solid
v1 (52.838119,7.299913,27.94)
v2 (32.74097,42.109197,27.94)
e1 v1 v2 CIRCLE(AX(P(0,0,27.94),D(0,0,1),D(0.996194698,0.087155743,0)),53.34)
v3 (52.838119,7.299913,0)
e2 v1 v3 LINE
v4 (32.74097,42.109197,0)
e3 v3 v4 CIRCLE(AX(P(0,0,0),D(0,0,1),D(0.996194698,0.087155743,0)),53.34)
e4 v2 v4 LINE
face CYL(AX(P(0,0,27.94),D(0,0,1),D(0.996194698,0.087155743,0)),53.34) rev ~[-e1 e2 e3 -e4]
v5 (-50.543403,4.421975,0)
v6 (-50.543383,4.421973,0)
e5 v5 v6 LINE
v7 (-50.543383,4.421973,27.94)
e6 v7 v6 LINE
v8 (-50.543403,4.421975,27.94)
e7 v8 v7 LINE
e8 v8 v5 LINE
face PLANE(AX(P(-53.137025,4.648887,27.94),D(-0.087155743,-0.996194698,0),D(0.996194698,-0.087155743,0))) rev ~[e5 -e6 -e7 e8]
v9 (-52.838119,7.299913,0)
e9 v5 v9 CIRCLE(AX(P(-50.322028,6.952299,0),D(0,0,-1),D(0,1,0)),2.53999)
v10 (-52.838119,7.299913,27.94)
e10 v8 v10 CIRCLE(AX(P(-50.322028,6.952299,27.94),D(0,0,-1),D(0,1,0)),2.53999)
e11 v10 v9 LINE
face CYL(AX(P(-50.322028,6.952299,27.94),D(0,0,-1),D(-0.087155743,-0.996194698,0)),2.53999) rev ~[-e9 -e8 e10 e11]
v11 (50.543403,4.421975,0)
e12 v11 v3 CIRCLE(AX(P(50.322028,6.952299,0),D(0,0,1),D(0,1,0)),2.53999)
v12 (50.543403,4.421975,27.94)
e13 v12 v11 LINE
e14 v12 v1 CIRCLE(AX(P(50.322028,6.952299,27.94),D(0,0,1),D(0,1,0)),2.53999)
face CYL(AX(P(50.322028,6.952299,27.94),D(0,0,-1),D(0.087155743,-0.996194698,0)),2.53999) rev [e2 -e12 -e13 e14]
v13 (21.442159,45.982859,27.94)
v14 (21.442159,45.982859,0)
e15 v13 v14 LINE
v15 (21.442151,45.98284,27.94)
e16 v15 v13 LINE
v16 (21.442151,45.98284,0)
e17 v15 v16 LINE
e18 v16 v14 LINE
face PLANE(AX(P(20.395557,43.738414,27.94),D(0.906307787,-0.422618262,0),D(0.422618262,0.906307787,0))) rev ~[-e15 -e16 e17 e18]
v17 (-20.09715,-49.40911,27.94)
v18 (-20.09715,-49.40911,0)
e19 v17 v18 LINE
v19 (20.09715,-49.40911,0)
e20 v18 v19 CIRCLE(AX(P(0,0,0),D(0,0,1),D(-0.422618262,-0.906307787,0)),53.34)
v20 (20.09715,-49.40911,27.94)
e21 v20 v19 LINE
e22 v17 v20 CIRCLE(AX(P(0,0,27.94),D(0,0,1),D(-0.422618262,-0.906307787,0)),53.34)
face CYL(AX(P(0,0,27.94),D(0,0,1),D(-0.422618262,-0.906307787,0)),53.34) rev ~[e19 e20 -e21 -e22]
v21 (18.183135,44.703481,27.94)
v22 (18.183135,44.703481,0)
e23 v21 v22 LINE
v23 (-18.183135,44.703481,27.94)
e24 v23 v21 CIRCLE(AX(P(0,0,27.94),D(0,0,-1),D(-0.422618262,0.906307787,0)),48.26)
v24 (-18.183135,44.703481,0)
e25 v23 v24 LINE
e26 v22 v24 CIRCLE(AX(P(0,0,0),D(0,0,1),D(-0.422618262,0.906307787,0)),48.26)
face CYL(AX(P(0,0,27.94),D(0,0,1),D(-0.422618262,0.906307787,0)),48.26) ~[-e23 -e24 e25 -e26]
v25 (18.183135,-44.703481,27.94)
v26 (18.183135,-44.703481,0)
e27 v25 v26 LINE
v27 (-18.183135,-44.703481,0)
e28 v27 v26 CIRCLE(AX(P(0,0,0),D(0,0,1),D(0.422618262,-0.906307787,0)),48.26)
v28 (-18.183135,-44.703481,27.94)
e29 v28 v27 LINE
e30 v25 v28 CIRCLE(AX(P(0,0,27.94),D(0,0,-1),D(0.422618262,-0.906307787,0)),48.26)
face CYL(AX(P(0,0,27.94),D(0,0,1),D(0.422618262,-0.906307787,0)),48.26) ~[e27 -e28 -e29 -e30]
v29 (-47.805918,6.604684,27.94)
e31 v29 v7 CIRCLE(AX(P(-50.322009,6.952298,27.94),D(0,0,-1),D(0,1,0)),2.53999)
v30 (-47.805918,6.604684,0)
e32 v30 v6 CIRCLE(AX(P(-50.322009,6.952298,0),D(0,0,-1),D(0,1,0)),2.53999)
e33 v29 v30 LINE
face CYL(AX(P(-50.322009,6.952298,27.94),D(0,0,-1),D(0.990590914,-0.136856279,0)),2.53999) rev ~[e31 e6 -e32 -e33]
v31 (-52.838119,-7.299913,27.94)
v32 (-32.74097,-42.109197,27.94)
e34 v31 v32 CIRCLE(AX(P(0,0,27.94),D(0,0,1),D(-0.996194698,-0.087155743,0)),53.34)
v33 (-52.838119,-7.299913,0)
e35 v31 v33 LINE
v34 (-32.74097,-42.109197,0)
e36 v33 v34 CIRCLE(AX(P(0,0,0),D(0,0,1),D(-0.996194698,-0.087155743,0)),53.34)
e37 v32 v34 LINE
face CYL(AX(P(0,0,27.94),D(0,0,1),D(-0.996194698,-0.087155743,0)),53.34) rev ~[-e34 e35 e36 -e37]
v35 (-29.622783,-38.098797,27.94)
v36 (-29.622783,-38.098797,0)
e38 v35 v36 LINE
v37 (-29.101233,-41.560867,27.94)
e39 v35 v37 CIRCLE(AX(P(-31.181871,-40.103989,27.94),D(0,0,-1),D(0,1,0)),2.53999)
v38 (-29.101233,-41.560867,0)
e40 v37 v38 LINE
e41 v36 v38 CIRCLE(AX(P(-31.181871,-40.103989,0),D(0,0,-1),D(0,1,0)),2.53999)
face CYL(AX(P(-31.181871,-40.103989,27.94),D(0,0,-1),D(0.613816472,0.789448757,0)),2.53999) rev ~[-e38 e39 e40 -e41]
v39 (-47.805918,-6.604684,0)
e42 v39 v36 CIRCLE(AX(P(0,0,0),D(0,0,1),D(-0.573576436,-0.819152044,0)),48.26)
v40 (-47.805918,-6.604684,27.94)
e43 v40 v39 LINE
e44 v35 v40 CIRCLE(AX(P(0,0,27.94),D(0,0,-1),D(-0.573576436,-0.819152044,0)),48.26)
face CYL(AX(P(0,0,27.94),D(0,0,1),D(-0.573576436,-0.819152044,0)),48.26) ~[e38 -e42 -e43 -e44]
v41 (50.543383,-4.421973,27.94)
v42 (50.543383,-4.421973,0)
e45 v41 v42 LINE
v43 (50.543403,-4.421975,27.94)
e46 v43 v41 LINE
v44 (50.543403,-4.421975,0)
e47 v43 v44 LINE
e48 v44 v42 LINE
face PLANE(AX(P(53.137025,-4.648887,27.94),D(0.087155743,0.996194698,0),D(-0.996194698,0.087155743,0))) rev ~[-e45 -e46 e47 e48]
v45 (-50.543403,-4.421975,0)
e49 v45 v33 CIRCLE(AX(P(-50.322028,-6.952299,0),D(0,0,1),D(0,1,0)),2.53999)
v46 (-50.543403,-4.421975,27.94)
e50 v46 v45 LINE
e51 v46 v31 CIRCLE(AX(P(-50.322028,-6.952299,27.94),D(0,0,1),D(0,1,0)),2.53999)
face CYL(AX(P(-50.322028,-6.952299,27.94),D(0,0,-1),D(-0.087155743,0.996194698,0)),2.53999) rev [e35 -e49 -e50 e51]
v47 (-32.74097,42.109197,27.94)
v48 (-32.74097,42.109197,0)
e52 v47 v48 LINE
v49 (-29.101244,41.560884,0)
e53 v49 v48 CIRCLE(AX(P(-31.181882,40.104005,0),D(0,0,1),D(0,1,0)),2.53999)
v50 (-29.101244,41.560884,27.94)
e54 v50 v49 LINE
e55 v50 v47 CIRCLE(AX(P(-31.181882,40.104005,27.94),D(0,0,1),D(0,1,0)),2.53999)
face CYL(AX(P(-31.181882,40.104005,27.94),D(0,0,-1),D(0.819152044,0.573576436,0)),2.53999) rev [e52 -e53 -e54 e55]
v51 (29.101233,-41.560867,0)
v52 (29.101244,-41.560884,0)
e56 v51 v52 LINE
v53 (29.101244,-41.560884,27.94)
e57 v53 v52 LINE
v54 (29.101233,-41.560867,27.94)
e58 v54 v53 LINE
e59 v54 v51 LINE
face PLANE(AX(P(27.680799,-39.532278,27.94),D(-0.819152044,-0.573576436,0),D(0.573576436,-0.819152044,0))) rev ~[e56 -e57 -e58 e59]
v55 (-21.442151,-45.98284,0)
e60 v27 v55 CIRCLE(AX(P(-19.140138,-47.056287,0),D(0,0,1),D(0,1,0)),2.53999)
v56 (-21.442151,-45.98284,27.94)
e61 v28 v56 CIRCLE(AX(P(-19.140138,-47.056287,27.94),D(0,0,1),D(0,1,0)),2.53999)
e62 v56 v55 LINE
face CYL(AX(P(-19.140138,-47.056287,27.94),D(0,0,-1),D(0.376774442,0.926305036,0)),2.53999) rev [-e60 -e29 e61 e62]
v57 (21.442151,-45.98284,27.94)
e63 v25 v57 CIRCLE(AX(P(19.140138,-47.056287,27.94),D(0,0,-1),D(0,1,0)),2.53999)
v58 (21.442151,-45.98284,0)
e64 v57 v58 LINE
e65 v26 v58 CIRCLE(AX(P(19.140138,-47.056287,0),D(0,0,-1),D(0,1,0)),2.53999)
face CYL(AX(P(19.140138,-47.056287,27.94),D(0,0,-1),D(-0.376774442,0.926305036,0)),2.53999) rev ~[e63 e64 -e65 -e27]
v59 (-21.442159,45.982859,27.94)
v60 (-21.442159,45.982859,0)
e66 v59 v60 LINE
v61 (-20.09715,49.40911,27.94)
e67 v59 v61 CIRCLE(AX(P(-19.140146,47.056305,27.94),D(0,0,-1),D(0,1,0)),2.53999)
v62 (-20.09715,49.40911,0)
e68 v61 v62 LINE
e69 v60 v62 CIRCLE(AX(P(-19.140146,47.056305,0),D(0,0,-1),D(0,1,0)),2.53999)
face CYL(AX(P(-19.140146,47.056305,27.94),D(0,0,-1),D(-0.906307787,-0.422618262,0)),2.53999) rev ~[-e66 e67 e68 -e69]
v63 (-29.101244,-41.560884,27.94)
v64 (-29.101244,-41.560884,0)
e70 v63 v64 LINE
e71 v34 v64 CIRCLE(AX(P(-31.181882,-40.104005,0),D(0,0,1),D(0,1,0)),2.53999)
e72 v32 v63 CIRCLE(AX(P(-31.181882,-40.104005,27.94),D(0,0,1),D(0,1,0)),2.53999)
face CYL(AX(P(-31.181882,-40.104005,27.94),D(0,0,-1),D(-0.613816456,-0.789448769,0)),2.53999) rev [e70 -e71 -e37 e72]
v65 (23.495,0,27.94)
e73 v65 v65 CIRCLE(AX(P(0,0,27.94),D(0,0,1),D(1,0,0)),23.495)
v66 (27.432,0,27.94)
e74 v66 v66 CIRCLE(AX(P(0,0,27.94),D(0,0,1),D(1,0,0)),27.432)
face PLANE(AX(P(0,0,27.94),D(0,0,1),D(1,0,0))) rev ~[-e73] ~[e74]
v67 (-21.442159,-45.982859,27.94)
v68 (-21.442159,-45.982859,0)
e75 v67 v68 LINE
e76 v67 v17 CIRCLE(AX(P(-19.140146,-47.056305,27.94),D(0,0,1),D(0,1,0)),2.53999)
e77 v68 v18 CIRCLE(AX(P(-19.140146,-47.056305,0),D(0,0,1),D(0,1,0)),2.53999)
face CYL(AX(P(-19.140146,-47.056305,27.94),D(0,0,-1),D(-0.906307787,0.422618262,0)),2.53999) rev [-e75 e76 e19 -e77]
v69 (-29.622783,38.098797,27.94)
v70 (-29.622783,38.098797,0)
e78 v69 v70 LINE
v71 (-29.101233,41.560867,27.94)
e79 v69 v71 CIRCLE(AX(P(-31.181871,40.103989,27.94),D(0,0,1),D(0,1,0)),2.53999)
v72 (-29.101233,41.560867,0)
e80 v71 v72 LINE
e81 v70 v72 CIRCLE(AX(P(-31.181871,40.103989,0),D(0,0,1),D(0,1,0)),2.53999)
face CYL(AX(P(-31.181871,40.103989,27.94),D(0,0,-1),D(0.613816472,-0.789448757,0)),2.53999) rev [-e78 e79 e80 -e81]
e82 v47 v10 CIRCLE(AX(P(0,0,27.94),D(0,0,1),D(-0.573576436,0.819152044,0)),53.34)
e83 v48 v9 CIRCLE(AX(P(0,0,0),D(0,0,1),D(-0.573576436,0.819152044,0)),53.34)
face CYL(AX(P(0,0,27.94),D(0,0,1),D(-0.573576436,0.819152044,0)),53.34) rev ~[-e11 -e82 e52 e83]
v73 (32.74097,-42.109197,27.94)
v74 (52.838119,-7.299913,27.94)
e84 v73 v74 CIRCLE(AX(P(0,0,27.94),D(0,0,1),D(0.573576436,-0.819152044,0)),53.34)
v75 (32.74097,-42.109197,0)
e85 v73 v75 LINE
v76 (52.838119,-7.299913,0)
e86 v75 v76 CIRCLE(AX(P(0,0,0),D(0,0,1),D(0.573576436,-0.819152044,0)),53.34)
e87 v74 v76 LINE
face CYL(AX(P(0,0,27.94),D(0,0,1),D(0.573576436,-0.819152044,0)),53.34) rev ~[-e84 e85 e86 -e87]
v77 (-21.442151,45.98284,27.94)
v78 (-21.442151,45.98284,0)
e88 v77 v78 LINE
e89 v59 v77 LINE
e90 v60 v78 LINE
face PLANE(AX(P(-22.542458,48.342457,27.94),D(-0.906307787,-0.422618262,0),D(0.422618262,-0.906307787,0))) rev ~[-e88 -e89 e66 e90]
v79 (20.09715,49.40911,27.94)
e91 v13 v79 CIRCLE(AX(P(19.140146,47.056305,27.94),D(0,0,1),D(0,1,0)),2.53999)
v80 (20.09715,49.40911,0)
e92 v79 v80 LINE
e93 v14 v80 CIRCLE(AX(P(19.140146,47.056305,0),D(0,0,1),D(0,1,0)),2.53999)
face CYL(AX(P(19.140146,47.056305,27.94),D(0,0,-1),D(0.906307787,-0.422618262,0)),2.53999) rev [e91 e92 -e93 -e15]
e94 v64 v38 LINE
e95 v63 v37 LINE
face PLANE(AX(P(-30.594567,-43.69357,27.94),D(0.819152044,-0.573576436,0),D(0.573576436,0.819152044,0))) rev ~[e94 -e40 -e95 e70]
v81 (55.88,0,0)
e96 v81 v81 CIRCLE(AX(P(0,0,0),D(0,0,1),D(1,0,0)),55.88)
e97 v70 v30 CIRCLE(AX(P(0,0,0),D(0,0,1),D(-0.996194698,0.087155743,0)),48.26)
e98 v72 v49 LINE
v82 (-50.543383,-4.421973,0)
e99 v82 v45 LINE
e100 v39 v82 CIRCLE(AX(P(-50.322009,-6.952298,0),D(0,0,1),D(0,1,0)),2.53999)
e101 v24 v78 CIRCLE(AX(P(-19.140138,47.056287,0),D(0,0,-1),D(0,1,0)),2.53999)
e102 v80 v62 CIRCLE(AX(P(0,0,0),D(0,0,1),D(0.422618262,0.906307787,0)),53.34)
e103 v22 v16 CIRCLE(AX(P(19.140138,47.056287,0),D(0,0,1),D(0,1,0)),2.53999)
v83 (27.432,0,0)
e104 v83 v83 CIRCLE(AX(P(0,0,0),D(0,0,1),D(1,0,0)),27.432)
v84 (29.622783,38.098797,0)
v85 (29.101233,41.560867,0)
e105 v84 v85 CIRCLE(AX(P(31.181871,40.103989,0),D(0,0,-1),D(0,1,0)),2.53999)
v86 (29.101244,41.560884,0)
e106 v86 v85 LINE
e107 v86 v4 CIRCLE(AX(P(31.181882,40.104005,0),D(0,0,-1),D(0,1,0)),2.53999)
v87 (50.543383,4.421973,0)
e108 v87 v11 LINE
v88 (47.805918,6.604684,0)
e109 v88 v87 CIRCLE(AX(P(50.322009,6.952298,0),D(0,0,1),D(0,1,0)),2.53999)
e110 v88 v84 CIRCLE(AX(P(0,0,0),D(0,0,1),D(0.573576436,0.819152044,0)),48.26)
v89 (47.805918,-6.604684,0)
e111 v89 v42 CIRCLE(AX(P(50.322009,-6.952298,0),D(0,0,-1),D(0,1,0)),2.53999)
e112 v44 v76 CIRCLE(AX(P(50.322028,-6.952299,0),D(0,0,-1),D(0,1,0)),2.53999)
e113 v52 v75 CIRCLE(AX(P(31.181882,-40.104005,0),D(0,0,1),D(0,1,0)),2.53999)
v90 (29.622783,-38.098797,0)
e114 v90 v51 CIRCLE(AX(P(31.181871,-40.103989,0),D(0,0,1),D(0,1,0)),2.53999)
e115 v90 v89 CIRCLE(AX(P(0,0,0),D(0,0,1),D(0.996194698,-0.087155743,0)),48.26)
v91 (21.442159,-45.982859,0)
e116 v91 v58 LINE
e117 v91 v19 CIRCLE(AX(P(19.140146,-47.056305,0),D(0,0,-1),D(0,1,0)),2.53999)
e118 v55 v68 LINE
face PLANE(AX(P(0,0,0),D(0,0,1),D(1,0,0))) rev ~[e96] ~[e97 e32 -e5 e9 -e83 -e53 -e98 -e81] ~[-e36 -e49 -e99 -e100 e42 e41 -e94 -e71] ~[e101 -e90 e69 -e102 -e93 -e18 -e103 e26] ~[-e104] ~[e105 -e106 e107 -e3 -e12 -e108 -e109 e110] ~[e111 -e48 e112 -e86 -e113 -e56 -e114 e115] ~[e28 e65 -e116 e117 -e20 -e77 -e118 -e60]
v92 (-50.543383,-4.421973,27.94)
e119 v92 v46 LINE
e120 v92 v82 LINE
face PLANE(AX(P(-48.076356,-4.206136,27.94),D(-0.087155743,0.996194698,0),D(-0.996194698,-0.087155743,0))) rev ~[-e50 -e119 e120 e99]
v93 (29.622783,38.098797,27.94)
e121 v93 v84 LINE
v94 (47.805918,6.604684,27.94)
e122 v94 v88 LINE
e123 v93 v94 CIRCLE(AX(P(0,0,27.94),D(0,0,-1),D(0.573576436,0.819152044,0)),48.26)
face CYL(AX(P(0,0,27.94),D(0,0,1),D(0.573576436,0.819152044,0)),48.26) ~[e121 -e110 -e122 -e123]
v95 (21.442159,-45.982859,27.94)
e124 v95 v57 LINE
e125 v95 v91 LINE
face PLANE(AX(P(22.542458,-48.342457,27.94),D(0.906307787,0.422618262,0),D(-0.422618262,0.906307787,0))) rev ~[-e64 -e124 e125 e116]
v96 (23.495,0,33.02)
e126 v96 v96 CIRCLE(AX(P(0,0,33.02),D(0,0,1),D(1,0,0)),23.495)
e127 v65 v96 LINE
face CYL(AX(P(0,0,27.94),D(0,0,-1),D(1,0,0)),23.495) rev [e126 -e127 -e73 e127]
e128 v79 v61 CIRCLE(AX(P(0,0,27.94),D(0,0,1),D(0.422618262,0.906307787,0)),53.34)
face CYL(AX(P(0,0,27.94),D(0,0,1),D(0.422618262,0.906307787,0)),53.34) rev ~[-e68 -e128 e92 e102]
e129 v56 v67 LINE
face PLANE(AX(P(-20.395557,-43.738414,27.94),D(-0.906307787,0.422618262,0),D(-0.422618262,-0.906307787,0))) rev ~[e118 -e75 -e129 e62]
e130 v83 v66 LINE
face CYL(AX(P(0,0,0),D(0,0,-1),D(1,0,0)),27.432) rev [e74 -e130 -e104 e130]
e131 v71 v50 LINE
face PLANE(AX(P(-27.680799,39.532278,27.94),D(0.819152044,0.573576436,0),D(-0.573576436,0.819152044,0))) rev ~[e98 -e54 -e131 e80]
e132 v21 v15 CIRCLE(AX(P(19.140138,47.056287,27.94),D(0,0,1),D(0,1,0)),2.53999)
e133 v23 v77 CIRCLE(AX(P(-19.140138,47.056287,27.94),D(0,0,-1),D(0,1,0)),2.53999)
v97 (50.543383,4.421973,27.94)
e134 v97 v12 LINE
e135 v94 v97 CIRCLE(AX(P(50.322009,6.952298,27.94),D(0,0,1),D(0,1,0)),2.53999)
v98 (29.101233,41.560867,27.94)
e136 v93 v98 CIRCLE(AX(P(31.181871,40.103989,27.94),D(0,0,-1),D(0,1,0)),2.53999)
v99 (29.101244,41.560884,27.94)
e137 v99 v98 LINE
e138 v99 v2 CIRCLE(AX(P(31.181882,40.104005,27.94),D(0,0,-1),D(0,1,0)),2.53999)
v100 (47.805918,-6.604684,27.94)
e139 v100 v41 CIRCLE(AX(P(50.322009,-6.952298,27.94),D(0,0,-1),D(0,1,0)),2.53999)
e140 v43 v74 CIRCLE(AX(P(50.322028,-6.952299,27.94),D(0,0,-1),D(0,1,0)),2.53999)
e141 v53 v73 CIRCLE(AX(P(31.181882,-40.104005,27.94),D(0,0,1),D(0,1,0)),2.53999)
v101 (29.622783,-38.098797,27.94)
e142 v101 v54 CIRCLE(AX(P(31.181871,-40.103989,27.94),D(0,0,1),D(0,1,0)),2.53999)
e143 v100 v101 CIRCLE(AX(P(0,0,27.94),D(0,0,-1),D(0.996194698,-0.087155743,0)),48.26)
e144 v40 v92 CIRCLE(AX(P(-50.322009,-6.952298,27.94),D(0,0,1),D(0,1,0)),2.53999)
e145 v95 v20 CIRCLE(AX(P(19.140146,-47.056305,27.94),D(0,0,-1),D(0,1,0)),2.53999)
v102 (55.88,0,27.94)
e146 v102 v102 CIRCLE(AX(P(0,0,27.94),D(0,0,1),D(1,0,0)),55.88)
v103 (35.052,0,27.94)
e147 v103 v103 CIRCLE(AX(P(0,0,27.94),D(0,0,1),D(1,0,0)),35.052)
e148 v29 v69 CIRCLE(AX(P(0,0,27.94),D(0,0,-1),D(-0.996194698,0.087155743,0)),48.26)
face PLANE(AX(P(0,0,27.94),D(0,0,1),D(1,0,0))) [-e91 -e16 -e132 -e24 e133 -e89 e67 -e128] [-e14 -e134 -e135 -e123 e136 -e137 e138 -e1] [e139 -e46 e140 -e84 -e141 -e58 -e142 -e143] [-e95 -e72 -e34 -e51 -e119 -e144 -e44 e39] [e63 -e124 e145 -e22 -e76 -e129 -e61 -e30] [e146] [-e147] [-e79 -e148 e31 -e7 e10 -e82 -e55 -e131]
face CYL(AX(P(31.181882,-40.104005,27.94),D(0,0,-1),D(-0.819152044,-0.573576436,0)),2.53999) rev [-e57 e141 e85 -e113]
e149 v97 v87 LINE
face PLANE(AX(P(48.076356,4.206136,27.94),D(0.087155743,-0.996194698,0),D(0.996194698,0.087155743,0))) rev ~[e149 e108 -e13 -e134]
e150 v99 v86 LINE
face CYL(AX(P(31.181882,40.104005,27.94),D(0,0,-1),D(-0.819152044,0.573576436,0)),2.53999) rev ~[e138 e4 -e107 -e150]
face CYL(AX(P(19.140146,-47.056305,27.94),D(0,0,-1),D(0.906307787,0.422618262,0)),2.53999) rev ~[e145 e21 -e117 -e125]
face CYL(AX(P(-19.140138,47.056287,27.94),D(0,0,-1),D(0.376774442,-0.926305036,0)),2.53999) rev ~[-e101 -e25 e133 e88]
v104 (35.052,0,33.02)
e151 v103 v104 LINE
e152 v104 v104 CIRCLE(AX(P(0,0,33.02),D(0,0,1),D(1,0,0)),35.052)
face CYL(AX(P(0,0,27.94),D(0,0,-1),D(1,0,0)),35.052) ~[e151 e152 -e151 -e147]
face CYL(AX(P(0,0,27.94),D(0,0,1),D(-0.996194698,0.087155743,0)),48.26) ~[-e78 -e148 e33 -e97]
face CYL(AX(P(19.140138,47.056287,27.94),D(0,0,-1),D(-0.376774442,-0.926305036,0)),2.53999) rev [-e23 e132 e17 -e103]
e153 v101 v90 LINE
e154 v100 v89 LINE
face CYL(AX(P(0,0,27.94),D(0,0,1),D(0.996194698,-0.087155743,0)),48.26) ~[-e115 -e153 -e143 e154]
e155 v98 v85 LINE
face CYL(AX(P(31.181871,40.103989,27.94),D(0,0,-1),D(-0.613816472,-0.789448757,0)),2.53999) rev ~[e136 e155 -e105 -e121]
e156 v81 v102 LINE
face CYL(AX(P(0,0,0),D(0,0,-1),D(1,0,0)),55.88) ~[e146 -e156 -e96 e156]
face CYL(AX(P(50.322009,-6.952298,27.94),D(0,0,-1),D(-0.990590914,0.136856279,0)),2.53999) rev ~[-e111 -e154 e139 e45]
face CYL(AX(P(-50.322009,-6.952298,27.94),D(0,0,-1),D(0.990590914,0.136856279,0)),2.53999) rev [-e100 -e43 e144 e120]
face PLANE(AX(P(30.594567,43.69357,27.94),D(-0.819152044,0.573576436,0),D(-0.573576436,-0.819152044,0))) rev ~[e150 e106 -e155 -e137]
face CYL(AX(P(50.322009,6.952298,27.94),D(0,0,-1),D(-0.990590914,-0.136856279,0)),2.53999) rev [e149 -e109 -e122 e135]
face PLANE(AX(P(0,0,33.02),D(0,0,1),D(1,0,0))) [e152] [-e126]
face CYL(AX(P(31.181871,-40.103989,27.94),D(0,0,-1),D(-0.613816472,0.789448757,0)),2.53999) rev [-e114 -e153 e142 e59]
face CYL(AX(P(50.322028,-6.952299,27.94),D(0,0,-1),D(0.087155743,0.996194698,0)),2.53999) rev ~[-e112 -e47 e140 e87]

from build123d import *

# Parameters (mm, degrees)
F0_R            = 55.88
F0_R_2          = 27.432
F1_DEPTH        = 27.94
F2_R            = 35.052
F2_R_2          = 23.495
F3_DEPTH        = 5.08
F5_DEPTH        = 27.941
F5_COPIES_COUNT = 6
F6_R            = 2.53999


# Not quite as in the source:
# - a fillet or chamfer is up to 0.001 mm smaller than in the source, because OpenCascade refuses the exact size
# - a pattern or mirror of a feature is missing from the dataset's text; its kind, count and spacing are read off the source's solid


with BuildPart() as f1:
    # F0 (on Top) → F1 (new body)
    with BuildSketch(Plane.XY):
        Circle(F0_R)
        Circle(F0_R_2, mode=Mode.SUBTRACT)
    extrude(amount=F1_DEPTH)

    # F2 (on face) → F3 (join)
    with BuildSketch(Plane.XY.offset(27.94)):
        Circle(F2_R)
        Circle(F2_R_2, mode=Mode.SUBTRACT)
    extrude(amount=F3_DEPTH)

    # F4 (on face) → F5 (cut, through all)
    with BuildSketch(Plane.XY.offset(27.94)):
        with BuildLine():
            ThreePointArc((20.3955573116, -43.7384138024), (0, -48.26), (-20.3955573116, -43.7384138024))
            Line((-20.3955573116, -43.7384138024), (-22.5424580812, -48.3424573605))
            ThreePointArc((-22.5424580812, -48.3424573605), (0, -53.34), (22.5424580812, -48.3424573605))
            Line((22.5424580812, -48.3424573605), (20.3955573116, -43.7384138024))
        make_face()
    f5 = extrude(amount=-F5_DEPTH, mode=Mode.SUBTRACT)

    # F5_copies: F5 ×6 about axis
    f5_copies_axis = Axis((0, 0, 0), (0, 0, 1))
    for i in range(1, F5_COPIES_COUNT):
        add(f5.rotate(f5_copies_axis, i * 360 / F5_COPIES_COUNT), mode=Mode.SUBTRACT)

    # F6 (radius 2.54 in the source; OpenCascade refuses exactly that, so slightly less here)
    f6_edges = [f1.edges().sort_by_distance(p)[0] for p in [
        (-22.542458, -48.342457, 13.97),
        (-20.395557, -43.738414, 13.97),
        (22.542458, -48.342457, 13.97),
        (20.395557, -43.738414, 13.97),
        (-53.137025, -4.648887, 13.97),
        (-48.076356, -4.206136, 13.97),
        (-30.594567, -43.69357, 13.97),
        (-27.680799, -39.532278, 13.97),
        (30.594567, -43.69357, 13.97),
        (27.680799, -39.532278, 13.97),
        (48.076356, -4.206136, 13.97),
        (53.137025, -4.648887, 13.97),
        (-30.594567, 43.69357, 13.97),
        (-27.680799, 39.532278, 13.97),
        (-48.076356, 4.206136, 13.97),
        (-53.137025, 4.648887, 13.97),
        (22.542458, 48.342457, 13.97),
        (20.395557, 43.738414, 13.97),
        (-20.395557, 43.738414, 13.97),
        (-22.542458, 48.342457, 13.97),
        (53.137025, 4.648887, 13.97),
        (48.076356, 4.206136, 13.97),
        (27.680799, 39.532278, 13.97),
        (30.594567, 43.69357, 13.97),
    ]]
    fillet(f6_edges, radius=F6_R)


solid = f1.part
